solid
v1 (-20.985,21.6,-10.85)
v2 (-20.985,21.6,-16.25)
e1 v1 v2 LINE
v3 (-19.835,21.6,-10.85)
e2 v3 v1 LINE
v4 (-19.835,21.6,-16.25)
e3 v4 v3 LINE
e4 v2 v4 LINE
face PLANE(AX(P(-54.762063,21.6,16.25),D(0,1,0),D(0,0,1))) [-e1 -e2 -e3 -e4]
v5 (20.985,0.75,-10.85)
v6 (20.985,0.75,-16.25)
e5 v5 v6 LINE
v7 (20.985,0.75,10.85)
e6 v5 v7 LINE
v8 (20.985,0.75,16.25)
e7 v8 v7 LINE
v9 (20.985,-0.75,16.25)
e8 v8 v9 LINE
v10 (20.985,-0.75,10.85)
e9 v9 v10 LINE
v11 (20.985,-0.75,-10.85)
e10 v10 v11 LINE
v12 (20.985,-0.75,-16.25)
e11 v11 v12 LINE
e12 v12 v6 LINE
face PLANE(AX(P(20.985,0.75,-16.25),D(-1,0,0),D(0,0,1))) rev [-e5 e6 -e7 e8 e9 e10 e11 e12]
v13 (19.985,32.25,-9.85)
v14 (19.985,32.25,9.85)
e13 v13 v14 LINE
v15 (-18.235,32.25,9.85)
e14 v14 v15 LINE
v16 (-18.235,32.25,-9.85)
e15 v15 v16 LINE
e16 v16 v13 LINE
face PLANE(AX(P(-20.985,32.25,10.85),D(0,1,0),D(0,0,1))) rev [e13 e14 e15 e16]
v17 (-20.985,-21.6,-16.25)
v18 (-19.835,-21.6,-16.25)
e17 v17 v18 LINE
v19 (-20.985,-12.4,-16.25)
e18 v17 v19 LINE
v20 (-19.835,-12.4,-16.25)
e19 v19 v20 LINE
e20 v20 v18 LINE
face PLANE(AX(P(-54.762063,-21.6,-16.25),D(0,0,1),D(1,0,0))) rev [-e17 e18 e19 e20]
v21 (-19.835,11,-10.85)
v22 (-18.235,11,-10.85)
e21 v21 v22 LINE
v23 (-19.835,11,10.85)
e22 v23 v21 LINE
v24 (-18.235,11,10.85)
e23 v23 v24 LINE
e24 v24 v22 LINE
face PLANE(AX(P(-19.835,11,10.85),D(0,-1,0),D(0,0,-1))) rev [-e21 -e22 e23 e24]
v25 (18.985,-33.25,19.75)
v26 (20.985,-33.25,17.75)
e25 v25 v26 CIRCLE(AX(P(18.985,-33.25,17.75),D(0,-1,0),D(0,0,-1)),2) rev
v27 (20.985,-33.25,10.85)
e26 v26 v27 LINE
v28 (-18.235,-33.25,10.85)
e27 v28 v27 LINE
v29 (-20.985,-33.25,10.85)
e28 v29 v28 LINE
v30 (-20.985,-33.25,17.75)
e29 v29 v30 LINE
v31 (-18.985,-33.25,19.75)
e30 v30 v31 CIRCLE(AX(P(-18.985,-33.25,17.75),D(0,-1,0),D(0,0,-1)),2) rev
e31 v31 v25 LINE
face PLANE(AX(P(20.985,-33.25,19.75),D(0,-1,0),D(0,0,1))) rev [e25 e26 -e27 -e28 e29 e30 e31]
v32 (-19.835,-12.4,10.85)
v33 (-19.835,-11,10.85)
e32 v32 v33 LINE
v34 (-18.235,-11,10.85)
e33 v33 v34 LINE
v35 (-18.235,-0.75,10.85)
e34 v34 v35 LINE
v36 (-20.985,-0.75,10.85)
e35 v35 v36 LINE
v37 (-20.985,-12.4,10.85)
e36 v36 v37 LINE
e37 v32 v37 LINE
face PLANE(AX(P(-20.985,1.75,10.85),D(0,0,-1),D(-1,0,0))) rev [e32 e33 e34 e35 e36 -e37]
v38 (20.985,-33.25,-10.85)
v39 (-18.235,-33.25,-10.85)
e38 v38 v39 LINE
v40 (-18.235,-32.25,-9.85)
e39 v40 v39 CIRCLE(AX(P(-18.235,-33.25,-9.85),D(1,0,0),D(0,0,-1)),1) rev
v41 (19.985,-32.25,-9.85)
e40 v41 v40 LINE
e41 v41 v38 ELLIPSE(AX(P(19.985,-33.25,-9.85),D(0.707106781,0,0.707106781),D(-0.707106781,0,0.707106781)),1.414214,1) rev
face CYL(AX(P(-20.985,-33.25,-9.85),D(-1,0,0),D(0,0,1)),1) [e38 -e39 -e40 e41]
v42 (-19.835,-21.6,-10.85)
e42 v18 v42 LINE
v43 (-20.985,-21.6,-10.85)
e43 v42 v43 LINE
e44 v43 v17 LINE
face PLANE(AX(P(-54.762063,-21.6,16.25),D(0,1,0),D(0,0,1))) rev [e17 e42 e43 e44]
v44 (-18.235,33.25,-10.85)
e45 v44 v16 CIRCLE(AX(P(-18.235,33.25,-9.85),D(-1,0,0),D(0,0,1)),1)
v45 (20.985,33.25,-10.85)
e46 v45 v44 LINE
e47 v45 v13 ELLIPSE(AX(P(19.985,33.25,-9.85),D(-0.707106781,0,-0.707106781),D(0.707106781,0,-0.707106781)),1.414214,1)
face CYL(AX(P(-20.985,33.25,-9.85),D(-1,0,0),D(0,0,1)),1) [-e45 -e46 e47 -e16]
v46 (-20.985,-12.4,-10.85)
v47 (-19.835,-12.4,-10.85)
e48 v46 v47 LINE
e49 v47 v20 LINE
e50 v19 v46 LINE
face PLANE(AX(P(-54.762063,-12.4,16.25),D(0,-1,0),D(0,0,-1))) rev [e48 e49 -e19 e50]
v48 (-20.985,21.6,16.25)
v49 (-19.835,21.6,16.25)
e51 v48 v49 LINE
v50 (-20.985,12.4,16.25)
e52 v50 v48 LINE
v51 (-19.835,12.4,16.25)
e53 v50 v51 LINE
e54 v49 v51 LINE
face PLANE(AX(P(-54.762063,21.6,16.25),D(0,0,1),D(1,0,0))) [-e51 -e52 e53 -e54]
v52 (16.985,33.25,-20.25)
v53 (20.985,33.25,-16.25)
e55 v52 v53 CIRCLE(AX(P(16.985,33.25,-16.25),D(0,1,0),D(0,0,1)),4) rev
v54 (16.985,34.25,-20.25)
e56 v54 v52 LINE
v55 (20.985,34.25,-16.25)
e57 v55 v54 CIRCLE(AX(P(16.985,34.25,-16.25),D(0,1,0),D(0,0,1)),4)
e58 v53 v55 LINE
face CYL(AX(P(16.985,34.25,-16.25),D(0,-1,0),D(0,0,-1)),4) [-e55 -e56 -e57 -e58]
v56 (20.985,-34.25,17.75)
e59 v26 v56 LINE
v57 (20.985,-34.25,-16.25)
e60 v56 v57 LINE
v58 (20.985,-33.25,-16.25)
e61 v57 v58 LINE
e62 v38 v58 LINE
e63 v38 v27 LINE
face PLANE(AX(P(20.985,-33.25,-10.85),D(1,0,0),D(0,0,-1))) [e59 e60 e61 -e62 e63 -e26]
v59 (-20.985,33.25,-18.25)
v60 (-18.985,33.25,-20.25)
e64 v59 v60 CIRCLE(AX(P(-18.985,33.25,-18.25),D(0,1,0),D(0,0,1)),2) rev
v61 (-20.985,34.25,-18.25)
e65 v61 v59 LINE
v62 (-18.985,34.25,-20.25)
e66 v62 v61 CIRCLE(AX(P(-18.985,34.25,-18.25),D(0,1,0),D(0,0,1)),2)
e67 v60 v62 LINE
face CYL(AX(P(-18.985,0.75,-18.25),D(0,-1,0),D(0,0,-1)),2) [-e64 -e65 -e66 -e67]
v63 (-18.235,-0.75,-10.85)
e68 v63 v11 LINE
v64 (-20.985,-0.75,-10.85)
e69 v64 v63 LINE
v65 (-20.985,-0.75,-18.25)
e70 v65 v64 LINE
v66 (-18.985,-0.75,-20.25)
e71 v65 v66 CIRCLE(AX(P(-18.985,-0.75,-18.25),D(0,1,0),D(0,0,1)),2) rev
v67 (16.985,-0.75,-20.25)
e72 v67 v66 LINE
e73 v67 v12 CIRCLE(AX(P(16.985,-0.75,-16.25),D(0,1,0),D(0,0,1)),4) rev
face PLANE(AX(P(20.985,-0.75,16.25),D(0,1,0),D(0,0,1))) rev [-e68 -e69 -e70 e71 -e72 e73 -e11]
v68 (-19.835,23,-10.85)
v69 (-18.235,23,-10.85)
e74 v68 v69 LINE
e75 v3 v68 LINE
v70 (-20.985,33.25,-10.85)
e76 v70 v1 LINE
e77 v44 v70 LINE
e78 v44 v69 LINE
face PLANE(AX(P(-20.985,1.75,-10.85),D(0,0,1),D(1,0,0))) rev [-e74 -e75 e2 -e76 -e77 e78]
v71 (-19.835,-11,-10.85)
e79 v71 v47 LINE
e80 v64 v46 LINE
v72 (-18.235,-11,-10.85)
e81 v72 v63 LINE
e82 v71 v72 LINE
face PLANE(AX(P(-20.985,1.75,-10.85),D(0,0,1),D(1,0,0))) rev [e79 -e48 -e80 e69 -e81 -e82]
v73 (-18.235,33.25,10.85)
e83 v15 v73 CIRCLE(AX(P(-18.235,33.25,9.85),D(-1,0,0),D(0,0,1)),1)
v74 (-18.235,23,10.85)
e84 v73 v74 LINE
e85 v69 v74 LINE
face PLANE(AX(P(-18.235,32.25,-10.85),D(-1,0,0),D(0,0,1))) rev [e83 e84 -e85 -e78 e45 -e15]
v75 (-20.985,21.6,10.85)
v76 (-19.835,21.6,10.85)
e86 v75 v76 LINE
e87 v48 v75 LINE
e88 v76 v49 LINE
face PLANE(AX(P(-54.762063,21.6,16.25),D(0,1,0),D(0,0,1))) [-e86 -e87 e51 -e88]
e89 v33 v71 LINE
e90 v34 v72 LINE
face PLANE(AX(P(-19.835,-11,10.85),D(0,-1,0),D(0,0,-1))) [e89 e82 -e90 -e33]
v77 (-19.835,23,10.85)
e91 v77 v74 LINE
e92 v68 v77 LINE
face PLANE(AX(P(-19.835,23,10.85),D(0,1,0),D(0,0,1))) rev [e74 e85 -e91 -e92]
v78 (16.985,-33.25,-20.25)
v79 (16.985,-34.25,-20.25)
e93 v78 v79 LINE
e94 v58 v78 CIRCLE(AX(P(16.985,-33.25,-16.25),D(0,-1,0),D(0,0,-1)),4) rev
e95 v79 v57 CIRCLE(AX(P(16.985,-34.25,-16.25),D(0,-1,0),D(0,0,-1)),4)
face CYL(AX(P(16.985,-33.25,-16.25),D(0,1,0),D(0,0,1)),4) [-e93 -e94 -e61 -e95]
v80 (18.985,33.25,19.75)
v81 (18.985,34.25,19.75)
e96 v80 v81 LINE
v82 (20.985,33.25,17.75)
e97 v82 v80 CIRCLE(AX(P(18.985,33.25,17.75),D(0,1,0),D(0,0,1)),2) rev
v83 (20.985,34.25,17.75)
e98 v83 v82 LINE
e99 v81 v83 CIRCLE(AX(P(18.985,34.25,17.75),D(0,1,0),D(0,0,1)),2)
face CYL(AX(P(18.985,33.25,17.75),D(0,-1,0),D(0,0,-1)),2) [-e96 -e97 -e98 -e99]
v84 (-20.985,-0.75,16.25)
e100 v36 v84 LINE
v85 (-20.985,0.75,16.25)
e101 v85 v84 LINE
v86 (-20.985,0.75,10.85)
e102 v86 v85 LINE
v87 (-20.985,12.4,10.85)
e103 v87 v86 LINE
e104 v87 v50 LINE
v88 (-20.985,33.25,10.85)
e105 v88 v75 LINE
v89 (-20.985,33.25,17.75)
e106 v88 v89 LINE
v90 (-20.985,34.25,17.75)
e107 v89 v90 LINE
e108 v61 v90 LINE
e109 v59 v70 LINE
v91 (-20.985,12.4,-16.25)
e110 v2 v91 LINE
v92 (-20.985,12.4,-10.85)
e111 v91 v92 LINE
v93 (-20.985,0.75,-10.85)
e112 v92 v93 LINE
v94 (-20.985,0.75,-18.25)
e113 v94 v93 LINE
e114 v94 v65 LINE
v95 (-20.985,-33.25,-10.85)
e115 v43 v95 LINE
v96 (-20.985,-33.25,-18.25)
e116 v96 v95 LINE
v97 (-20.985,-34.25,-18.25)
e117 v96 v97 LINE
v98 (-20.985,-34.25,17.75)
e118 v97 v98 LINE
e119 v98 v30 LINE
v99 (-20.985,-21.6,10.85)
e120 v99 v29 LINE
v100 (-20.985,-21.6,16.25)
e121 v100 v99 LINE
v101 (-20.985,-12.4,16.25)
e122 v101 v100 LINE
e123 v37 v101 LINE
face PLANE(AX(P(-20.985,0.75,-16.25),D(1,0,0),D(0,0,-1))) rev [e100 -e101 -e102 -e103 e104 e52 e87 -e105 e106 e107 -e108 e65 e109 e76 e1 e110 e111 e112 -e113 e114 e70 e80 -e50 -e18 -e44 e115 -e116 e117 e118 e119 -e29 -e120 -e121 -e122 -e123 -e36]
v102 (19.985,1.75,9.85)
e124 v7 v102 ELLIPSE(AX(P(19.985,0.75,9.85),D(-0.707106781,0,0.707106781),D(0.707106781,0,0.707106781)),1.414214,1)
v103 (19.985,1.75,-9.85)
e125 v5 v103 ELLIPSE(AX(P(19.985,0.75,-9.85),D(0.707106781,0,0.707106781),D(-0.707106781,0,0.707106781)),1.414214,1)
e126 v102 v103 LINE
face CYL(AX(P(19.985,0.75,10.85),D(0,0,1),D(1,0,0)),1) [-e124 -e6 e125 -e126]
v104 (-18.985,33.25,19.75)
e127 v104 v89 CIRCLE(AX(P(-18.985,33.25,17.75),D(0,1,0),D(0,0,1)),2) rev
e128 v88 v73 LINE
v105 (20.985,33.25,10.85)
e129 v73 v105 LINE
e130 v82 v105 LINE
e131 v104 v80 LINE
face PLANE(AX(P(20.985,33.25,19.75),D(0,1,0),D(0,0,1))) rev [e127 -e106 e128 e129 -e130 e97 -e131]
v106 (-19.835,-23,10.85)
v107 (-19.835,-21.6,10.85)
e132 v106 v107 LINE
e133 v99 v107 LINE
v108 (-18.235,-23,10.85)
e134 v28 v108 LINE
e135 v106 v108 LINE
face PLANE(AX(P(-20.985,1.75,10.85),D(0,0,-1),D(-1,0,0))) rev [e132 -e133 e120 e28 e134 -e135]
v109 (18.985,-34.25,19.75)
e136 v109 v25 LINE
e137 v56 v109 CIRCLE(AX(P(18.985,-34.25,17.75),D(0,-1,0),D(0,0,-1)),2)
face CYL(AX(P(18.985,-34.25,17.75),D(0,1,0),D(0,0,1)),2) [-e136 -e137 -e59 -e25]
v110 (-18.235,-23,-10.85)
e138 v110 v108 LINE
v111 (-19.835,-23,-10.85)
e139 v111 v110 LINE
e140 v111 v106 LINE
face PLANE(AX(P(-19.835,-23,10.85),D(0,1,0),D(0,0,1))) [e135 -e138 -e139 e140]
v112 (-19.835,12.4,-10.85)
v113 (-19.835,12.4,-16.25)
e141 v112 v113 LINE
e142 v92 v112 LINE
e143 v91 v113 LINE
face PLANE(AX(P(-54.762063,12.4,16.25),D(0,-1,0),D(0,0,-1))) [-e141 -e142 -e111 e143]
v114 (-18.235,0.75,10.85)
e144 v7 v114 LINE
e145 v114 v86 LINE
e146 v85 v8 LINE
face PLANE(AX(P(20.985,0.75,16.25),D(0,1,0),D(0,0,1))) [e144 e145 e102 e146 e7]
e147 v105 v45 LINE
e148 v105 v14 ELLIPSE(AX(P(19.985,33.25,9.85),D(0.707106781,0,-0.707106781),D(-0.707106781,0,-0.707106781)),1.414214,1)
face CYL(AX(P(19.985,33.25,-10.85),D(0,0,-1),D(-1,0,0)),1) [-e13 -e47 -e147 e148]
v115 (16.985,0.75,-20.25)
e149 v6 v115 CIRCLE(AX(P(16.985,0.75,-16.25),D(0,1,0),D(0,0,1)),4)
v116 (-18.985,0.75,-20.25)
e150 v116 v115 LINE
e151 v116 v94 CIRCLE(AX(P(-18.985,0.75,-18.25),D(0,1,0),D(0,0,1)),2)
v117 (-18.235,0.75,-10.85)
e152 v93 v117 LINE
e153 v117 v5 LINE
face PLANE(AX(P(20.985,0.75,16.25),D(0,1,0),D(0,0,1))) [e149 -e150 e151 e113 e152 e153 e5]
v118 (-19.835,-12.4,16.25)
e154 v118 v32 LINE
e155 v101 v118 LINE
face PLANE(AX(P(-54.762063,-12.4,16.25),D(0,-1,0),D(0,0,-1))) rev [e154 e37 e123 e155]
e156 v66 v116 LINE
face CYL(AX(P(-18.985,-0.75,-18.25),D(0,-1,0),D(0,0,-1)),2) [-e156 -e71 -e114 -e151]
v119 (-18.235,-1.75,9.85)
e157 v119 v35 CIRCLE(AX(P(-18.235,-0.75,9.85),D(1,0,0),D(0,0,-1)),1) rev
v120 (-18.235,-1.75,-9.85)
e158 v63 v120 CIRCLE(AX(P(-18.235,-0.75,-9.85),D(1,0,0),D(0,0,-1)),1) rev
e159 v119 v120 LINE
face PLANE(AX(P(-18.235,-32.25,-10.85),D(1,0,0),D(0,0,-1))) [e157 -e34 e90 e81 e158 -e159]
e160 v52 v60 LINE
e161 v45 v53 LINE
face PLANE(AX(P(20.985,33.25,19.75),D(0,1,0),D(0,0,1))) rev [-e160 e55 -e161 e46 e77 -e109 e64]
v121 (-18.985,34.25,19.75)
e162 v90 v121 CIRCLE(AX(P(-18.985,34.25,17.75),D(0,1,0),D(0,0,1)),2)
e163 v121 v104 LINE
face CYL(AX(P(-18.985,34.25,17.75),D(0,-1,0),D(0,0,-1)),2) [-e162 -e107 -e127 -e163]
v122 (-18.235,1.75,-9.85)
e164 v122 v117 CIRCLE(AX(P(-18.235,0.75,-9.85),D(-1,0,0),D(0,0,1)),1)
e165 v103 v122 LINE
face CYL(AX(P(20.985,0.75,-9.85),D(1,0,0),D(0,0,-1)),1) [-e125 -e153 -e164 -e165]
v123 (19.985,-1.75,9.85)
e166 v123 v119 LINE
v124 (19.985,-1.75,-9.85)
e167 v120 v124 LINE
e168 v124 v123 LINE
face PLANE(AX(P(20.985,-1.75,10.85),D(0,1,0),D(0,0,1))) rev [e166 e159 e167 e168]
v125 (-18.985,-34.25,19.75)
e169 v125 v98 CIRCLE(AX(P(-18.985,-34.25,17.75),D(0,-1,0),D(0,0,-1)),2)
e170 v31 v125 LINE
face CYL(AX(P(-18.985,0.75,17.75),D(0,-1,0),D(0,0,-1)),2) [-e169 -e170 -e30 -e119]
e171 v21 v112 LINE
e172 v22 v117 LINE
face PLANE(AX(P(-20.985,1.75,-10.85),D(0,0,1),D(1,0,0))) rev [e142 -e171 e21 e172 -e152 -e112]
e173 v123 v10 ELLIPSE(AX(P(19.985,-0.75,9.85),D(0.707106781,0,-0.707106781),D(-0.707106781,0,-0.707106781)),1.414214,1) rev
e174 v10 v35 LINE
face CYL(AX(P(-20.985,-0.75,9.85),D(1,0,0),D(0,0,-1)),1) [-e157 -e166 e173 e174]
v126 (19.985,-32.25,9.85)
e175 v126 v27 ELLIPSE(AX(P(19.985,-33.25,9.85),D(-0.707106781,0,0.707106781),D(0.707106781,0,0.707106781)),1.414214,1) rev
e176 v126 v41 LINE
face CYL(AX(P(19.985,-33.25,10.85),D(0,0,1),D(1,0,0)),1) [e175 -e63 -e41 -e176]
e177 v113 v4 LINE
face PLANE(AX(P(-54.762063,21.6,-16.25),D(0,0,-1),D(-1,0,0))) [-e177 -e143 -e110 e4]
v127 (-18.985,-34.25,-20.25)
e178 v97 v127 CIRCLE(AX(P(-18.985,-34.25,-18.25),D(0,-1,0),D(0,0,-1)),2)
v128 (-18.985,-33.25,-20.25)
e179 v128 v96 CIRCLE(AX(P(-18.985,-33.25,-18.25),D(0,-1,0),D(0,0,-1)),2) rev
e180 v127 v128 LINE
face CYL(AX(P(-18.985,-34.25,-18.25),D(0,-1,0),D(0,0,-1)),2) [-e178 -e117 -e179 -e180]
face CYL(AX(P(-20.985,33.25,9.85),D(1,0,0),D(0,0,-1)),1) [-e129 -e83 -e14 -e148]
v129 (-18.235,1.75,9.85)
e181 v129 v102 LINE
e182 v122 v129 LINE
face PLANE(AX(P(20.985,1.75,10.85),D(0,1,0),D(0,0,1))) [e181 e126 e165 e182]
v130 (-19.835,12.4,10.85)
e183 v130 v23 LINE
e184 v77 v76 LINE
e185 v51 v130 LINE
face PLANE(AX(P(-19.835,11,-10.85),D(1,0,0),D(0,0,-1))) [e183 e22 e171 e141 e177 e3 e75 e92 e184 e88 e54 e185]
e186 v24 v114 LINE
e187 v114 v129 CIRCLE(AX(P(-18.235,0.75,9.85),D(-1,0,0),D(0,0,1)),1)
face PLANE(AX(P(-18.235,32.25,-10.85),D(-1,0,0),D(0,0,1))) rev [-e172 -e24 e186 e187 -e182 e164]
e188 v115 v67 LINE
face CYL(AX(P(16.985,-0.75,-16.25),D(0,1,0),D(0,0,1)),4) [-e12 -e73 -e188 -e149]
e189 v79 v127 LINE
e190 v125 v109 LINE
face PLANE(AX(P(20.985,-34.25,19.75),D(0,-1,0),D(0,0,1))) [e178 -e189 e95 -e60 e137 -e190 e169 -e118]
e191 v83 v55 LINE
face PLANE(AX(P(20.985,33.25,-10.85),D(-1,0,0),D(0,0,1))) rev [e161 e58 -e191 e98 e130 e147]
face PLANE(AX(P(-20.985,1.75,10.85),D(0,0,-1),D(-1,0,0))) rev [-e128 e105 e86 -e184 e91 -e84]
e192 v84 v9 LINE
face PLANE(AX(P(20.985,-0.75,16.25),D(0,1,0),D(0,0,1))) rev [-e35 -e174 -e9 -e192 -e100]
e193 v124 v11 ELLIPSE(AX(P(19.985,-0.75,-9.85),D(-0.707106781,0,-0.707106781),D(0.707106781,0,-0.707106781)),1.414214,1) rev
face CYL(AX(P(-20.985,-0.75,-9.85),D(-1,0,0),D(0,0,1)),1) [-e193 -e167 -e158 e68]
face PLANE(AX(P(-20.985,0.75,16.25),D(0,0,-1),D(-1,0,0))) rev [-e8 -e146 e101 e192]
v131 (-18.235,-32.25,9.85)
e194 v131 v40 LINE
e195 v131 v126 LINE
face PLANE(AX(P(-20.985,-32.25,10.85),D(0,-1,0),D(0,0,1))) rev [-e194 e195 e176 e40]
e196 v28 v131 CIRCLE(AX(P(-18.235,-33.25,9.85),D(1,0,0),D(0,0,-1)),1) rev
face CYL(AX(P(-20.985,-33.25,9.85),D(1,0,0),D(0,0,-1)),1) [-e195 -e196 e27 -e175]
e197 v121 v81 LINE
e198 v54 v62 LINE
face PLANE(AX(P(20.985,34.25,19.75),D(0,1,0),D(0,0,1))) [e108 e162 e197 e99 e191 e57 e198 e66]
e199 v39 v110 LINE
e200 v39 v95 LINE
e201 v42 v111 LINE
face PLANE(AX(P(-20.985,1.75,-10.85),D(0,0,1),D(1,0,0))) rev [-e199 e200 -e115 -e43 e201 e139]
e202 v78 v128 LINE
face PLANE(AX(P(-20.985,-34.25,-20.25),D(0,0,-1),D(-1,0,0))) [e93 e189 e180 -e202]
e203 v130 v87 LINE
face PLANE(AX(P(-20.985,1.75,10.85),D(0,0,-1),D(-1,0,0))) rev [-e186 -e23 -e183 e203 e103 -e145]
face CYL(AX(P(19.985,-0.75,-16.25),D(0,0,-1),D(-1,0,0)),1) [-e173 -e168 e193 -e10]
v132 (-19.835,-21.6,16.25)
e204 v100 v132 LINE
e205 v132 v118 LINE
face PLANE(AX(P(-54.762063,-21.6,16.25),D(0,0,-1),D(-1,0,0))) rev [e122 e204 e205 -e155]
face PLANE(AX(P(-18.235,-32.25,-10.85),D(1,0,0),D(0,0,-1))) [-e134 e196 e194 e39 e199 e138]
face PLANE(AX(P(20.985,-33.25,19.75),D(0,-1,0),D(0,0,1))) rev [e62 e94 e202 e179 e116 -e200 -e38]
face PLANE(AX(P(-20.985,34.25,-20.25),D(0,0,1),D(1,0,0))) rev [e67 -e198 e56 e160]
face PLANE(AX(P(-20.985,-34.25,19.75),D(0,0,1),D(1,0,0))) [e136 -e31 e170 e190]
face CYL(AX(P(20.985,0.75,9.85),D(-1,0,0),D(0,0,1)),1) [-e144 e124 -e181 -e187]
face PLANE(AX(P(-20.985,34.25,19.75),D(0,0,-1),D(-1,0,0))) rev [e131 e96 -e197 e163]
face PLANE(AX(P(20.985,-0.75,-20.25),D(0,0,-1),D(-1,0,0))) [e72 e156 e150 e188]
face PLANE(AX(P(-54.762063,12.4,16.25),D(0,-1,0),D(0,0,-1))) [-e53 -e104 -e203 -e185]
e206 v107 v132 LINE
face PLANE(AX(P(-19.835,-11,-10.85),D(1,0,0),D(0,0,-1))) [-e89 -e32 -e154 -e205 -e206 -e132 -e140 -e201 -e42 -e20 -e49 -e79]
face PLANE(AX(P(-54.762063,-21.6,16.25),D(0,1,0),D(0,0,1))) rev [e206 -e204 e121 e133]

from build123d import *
from OCP.BRepFilletAPI import BRepFilletAPI_MakeFillet

# Parameters (mm, degrees)
SKETCH1_W              = 41.97
SKETCH1_H              = 32.5
BOSS_EXTRUDE1_DEPTH    = 0.75
SKETCH2_W              = 41.97
SKETCH2_H              = 21.7
BOSS_EXTRUDE2_DEPTH    = 1.75
SKETCH4_W              = 2.75
SKETCH4_H              = 21.7
BOSS_EXTRUDE3_DEPTH    = 31.5
SKETCH5_W              = 21.7
SKETCH5_H              = 12
CUT_EXTRUDE1_DEPTH     = 1.6
SKETCH6_W              = 32.5
SKETCH6_H              = 9.2
BOSS_EXTRUDE4_DEPTH    = 1.15
SKETCH7_W              = 41.97
SKETCH7_H              = 21.7
BOSS_EXTRUDE5_DEPTH    = 1
SKETCH8_W              = 41.97
SKETCH8_H              = 40
BOSS_EXTRUDE6_DEPTH    = 1
FILLET1_R              = 4
FILLET1_R_2            = 2
FILLET1_R_3            = 1
FILLET1_OF_MIRROR2_R   = 4
FILLET1_OF_MIRROR2_R_2 = 2
FILLET1_OF_MIRROR2_R_3 = 1
FILLET2_R              = 1
SKETCH9_W              = 41.97
SKETCH9_H              = 1.5
BOSS_EXTRUDE7_DEPTH    = 4
FILLET4_R              = 4
FILLET5_R              = 2


with BuildPart() as part:
    # Sketch1 → Boss-Extrude1 (new, symmetric)
    with BuildSketch(Plane(origin=(0, 0, 0), x_dir=(1, 0, 0), z_dir=(0, 1, 0))):
        Rectangle(SKETCH1_W, SKETCH1_H)
    extrude(amount=BOSS_EXTRUDE1_DEPTH, both=True)

    # Sketch2 → Boss-Extrude2 (add, symmetric)
    with BuildSketch(Plane(origin=(0, 0, 0), x_dir=(1, 0, 0), z_dir=(0, 1, 0))):
        Rectangle(SKETCH2_W, SKETCH2_H)
    extrude(amount=BOSS_EXTRUDE2_DEPTH, both=True)

    # Sketch4 → Boss-Extrude3 (add)
    with BuildSketch(Plane(origin=(0, 0.75, 0), x_dir=(1, 0, 0), z_dir=(0, 1, 0))):
        with Locations((-19.61, 0)):
            Rectangle(SKETCH4_W, SKETCH4_H)
    boss_extrude3 = extrude(amount=BOSS_EXTRUDE3_DEPTH)

    # Sketch5 → Cut-Extrude1 (cut)
    with BuildSketch(Plane(origin=(-18.235, 0, 0), x_dir=(0, 0, -1), z_dir=(1, 0, 0))):
        with Locations((0, 17)):
            Rectangle(SKETCH5_W, SKETCH5_H)
    cut_extrude1 = extrude(amount=-CUT_EXTRUDE1_DEPTH, mode=Mode.SUBTRACT)

    # Sketch6 → Boss-Extrude4 (add)
    with BuildSketch(Plane(origin=(-19.835, 0, 0), x_dir=(0, 0, -1), z_dir=(1, 0, 0))):
        with Locations((0, 17)):
            Rectangle(SKETCH6_W, SKETCH6_H)
    boss_extrude4 = extrude(amount=-BOSS_EXTRUDE4_DEPTH)

    # Sketch7 → Boss-Extrude5 (add)
    with BuildSketch(Plane(origin=(0, 32.25, 0), x_dir=(1, 0, 0), z_dir=(0, 1, 0))):
        Rectangle(SKETCH7_W, SKETCH7_H)
    boss_extrude5 = extrude(amount=BOSS_EXTRUDE5_DEPTH)

    # Sketch8 → Boss-Extrude6 (add)
    with BuildSketch(Plane(origin=(0, 33.25, 0), x_dir=(1, 0, 0), z_dir=(0, 1, 0))):
        with Locations((0, 0.25)):
            Rectangle(SKETCH8_W, SKETCH8_H)
    boss_extrude6 = extrude(amount=BOSS_EXTRUDE6_DEPTH)

    # Fillet1
    fillet1_edges_1 = [part.edges().sort_by_distance(p)[0] for p in [
        (20.985, 33.75, -20.25),
    ]]
    fillet1_edges_2 = [part.edges().sort_by_distance(p)[0] for p in [
        (-20.985, 33.75, -20.25),
        (-20.985, 33.75, 19.75),
        (20.985, 33.75, 19.75),
    ]]
    fillet1_edges_3 = [part.edges().sort_by_distance(p)[0] for p in [
        (20.985, 32.25, 0),
        (1.375, 32.25, 10.85),
        (1.375, 32.25, -10.85),
    ]]
    fillet1 = BRepFilletAPI_MakeFillet(part.part.solid().wrapped)
    for e in fillet1_edges_1:
        fillet1.Add(FILLET1_R - 0.0001, e.wrapped)
    for e in fillet1_edges_2:
        fillet1.Add(FILLET1_R_2 - 0.0001, e.wrapped)
    for e in fillet1_edges_3:
        fillet1.Add(FILLET1_R_3 - 0.0001, e.wrapped)
    add(Compound.cast(fillet1.Shape()), mode=Mode.REPLACE)  # a hair under: the kernel refuses the full size

    # Mirror2: Boss-Extrude3, Cut-Extrude1, Boss-Extrude4, Boss-Extrude5, Boss-Extrude6 across plane
    add(boss_extrude3.mirror(Plane.ZX))
    add(cut_extrude1.mirror(Plane.ZX), mode=Mode.SUBTRACT)
    add(boss_extrude4.mirror(Plane.ZX))
    add(boss_extrude5.mirror(Plane.ZX))
    add(boss_extrude6.mirror(Plane.ZX))

    # Fillet1 of Mirror2
    fillet1_of_mirror2_edges_1 = [part.edges().sort_by_distance(p)[0] for p in [
        (20.985, -33.75, -20.25),
    ]]
    fillet1_of_mirror2_edges_2 = [part.edges().sort_by_distance(p)[0] for p in [
        (-20.985, -33.75, -20.25),
        (-20.985, -33.75, 19.75),
        (20.985, -33.75, 19.75),
    ]]
    fillet1_of_mirror2_edges_3 = [part.edges().sort_by_distance(p)[0] for p in [
        (20.985, -32.25, 0),
        (1.375, -32.25, 10.85),
        (1.375, -32.25, -10.85),
    ]]
    fillet1_of_mirror2 = BRepFilletAPI_MakeFillet(part.part.solid().wrapped)
    for e in fillet1_of_mirror2_edges_1:
        fillet1_of_mirror2.Add(FILLET1_OF_MIRROR2_R - 0.0001, e.wrapped)
    for e in fillet1_of_mirror2_edges_2:
        fillet1_of_mirror2.Add(FILLET1_OF_MIRROR2_R_2 - 0.0001, e.wrapped)
    for e in fillet1_of_mirror2_edges_3:
        fillet1_of_mirror2.Add(FILLET1_OF_MIRROR2_R_3 - 0.0001, e.wrapped)
    add(Compound.cast(fillet1_of_mirror2.Shape()), mode=Mode.REPLACE)  # a hair under: the kernel refuses the full size

    # Fillet2
    fillet2_edges = [part.edges().sort_by_distance(p)[0] for p in [
        (20.985, -1.75, 0),
        (20.985, 1.75, 0),
        (1.375, -1.75, 10.85),
        (1.375, -1.75, -10.85),
        (1.375, 1.75, 10.85),
        (1.375, 1.75, -10.85),
    ]]
    fillet(fillet2_edges, radius=FILLET2_R - 0.0001)  # a hair under: the kernel refuses the full size

    # Sketch9 → Boss-Extrude7 (add)
    with BuildSketch(Plane(origin=(0, 0, -16.25), x_dir=(-1, 0, 0), z_dir=(0, 0, -1))):
        Rectangle(SKETCH9_W, SKETCH9_H)
    extrude(amount=BOSS_EXTRUDE7_DEPTH)

    # Fillet4
    fillet4_edges = [part.edges().sort_by_distance(p)[0] for p in [
        (20.985, 0, -20.25),
    ]]
    fillet(fillet4_edges, radius=FILLET4_R)

    # Fillet5
    fillet5_edges = [part.edges().sort_by_distance(p)[0] for p in [
        (-20.985, 0, -20.25),
    ]]
    fillet(fillet5_edges, radius=FILLET5_R)


solid = part.part
